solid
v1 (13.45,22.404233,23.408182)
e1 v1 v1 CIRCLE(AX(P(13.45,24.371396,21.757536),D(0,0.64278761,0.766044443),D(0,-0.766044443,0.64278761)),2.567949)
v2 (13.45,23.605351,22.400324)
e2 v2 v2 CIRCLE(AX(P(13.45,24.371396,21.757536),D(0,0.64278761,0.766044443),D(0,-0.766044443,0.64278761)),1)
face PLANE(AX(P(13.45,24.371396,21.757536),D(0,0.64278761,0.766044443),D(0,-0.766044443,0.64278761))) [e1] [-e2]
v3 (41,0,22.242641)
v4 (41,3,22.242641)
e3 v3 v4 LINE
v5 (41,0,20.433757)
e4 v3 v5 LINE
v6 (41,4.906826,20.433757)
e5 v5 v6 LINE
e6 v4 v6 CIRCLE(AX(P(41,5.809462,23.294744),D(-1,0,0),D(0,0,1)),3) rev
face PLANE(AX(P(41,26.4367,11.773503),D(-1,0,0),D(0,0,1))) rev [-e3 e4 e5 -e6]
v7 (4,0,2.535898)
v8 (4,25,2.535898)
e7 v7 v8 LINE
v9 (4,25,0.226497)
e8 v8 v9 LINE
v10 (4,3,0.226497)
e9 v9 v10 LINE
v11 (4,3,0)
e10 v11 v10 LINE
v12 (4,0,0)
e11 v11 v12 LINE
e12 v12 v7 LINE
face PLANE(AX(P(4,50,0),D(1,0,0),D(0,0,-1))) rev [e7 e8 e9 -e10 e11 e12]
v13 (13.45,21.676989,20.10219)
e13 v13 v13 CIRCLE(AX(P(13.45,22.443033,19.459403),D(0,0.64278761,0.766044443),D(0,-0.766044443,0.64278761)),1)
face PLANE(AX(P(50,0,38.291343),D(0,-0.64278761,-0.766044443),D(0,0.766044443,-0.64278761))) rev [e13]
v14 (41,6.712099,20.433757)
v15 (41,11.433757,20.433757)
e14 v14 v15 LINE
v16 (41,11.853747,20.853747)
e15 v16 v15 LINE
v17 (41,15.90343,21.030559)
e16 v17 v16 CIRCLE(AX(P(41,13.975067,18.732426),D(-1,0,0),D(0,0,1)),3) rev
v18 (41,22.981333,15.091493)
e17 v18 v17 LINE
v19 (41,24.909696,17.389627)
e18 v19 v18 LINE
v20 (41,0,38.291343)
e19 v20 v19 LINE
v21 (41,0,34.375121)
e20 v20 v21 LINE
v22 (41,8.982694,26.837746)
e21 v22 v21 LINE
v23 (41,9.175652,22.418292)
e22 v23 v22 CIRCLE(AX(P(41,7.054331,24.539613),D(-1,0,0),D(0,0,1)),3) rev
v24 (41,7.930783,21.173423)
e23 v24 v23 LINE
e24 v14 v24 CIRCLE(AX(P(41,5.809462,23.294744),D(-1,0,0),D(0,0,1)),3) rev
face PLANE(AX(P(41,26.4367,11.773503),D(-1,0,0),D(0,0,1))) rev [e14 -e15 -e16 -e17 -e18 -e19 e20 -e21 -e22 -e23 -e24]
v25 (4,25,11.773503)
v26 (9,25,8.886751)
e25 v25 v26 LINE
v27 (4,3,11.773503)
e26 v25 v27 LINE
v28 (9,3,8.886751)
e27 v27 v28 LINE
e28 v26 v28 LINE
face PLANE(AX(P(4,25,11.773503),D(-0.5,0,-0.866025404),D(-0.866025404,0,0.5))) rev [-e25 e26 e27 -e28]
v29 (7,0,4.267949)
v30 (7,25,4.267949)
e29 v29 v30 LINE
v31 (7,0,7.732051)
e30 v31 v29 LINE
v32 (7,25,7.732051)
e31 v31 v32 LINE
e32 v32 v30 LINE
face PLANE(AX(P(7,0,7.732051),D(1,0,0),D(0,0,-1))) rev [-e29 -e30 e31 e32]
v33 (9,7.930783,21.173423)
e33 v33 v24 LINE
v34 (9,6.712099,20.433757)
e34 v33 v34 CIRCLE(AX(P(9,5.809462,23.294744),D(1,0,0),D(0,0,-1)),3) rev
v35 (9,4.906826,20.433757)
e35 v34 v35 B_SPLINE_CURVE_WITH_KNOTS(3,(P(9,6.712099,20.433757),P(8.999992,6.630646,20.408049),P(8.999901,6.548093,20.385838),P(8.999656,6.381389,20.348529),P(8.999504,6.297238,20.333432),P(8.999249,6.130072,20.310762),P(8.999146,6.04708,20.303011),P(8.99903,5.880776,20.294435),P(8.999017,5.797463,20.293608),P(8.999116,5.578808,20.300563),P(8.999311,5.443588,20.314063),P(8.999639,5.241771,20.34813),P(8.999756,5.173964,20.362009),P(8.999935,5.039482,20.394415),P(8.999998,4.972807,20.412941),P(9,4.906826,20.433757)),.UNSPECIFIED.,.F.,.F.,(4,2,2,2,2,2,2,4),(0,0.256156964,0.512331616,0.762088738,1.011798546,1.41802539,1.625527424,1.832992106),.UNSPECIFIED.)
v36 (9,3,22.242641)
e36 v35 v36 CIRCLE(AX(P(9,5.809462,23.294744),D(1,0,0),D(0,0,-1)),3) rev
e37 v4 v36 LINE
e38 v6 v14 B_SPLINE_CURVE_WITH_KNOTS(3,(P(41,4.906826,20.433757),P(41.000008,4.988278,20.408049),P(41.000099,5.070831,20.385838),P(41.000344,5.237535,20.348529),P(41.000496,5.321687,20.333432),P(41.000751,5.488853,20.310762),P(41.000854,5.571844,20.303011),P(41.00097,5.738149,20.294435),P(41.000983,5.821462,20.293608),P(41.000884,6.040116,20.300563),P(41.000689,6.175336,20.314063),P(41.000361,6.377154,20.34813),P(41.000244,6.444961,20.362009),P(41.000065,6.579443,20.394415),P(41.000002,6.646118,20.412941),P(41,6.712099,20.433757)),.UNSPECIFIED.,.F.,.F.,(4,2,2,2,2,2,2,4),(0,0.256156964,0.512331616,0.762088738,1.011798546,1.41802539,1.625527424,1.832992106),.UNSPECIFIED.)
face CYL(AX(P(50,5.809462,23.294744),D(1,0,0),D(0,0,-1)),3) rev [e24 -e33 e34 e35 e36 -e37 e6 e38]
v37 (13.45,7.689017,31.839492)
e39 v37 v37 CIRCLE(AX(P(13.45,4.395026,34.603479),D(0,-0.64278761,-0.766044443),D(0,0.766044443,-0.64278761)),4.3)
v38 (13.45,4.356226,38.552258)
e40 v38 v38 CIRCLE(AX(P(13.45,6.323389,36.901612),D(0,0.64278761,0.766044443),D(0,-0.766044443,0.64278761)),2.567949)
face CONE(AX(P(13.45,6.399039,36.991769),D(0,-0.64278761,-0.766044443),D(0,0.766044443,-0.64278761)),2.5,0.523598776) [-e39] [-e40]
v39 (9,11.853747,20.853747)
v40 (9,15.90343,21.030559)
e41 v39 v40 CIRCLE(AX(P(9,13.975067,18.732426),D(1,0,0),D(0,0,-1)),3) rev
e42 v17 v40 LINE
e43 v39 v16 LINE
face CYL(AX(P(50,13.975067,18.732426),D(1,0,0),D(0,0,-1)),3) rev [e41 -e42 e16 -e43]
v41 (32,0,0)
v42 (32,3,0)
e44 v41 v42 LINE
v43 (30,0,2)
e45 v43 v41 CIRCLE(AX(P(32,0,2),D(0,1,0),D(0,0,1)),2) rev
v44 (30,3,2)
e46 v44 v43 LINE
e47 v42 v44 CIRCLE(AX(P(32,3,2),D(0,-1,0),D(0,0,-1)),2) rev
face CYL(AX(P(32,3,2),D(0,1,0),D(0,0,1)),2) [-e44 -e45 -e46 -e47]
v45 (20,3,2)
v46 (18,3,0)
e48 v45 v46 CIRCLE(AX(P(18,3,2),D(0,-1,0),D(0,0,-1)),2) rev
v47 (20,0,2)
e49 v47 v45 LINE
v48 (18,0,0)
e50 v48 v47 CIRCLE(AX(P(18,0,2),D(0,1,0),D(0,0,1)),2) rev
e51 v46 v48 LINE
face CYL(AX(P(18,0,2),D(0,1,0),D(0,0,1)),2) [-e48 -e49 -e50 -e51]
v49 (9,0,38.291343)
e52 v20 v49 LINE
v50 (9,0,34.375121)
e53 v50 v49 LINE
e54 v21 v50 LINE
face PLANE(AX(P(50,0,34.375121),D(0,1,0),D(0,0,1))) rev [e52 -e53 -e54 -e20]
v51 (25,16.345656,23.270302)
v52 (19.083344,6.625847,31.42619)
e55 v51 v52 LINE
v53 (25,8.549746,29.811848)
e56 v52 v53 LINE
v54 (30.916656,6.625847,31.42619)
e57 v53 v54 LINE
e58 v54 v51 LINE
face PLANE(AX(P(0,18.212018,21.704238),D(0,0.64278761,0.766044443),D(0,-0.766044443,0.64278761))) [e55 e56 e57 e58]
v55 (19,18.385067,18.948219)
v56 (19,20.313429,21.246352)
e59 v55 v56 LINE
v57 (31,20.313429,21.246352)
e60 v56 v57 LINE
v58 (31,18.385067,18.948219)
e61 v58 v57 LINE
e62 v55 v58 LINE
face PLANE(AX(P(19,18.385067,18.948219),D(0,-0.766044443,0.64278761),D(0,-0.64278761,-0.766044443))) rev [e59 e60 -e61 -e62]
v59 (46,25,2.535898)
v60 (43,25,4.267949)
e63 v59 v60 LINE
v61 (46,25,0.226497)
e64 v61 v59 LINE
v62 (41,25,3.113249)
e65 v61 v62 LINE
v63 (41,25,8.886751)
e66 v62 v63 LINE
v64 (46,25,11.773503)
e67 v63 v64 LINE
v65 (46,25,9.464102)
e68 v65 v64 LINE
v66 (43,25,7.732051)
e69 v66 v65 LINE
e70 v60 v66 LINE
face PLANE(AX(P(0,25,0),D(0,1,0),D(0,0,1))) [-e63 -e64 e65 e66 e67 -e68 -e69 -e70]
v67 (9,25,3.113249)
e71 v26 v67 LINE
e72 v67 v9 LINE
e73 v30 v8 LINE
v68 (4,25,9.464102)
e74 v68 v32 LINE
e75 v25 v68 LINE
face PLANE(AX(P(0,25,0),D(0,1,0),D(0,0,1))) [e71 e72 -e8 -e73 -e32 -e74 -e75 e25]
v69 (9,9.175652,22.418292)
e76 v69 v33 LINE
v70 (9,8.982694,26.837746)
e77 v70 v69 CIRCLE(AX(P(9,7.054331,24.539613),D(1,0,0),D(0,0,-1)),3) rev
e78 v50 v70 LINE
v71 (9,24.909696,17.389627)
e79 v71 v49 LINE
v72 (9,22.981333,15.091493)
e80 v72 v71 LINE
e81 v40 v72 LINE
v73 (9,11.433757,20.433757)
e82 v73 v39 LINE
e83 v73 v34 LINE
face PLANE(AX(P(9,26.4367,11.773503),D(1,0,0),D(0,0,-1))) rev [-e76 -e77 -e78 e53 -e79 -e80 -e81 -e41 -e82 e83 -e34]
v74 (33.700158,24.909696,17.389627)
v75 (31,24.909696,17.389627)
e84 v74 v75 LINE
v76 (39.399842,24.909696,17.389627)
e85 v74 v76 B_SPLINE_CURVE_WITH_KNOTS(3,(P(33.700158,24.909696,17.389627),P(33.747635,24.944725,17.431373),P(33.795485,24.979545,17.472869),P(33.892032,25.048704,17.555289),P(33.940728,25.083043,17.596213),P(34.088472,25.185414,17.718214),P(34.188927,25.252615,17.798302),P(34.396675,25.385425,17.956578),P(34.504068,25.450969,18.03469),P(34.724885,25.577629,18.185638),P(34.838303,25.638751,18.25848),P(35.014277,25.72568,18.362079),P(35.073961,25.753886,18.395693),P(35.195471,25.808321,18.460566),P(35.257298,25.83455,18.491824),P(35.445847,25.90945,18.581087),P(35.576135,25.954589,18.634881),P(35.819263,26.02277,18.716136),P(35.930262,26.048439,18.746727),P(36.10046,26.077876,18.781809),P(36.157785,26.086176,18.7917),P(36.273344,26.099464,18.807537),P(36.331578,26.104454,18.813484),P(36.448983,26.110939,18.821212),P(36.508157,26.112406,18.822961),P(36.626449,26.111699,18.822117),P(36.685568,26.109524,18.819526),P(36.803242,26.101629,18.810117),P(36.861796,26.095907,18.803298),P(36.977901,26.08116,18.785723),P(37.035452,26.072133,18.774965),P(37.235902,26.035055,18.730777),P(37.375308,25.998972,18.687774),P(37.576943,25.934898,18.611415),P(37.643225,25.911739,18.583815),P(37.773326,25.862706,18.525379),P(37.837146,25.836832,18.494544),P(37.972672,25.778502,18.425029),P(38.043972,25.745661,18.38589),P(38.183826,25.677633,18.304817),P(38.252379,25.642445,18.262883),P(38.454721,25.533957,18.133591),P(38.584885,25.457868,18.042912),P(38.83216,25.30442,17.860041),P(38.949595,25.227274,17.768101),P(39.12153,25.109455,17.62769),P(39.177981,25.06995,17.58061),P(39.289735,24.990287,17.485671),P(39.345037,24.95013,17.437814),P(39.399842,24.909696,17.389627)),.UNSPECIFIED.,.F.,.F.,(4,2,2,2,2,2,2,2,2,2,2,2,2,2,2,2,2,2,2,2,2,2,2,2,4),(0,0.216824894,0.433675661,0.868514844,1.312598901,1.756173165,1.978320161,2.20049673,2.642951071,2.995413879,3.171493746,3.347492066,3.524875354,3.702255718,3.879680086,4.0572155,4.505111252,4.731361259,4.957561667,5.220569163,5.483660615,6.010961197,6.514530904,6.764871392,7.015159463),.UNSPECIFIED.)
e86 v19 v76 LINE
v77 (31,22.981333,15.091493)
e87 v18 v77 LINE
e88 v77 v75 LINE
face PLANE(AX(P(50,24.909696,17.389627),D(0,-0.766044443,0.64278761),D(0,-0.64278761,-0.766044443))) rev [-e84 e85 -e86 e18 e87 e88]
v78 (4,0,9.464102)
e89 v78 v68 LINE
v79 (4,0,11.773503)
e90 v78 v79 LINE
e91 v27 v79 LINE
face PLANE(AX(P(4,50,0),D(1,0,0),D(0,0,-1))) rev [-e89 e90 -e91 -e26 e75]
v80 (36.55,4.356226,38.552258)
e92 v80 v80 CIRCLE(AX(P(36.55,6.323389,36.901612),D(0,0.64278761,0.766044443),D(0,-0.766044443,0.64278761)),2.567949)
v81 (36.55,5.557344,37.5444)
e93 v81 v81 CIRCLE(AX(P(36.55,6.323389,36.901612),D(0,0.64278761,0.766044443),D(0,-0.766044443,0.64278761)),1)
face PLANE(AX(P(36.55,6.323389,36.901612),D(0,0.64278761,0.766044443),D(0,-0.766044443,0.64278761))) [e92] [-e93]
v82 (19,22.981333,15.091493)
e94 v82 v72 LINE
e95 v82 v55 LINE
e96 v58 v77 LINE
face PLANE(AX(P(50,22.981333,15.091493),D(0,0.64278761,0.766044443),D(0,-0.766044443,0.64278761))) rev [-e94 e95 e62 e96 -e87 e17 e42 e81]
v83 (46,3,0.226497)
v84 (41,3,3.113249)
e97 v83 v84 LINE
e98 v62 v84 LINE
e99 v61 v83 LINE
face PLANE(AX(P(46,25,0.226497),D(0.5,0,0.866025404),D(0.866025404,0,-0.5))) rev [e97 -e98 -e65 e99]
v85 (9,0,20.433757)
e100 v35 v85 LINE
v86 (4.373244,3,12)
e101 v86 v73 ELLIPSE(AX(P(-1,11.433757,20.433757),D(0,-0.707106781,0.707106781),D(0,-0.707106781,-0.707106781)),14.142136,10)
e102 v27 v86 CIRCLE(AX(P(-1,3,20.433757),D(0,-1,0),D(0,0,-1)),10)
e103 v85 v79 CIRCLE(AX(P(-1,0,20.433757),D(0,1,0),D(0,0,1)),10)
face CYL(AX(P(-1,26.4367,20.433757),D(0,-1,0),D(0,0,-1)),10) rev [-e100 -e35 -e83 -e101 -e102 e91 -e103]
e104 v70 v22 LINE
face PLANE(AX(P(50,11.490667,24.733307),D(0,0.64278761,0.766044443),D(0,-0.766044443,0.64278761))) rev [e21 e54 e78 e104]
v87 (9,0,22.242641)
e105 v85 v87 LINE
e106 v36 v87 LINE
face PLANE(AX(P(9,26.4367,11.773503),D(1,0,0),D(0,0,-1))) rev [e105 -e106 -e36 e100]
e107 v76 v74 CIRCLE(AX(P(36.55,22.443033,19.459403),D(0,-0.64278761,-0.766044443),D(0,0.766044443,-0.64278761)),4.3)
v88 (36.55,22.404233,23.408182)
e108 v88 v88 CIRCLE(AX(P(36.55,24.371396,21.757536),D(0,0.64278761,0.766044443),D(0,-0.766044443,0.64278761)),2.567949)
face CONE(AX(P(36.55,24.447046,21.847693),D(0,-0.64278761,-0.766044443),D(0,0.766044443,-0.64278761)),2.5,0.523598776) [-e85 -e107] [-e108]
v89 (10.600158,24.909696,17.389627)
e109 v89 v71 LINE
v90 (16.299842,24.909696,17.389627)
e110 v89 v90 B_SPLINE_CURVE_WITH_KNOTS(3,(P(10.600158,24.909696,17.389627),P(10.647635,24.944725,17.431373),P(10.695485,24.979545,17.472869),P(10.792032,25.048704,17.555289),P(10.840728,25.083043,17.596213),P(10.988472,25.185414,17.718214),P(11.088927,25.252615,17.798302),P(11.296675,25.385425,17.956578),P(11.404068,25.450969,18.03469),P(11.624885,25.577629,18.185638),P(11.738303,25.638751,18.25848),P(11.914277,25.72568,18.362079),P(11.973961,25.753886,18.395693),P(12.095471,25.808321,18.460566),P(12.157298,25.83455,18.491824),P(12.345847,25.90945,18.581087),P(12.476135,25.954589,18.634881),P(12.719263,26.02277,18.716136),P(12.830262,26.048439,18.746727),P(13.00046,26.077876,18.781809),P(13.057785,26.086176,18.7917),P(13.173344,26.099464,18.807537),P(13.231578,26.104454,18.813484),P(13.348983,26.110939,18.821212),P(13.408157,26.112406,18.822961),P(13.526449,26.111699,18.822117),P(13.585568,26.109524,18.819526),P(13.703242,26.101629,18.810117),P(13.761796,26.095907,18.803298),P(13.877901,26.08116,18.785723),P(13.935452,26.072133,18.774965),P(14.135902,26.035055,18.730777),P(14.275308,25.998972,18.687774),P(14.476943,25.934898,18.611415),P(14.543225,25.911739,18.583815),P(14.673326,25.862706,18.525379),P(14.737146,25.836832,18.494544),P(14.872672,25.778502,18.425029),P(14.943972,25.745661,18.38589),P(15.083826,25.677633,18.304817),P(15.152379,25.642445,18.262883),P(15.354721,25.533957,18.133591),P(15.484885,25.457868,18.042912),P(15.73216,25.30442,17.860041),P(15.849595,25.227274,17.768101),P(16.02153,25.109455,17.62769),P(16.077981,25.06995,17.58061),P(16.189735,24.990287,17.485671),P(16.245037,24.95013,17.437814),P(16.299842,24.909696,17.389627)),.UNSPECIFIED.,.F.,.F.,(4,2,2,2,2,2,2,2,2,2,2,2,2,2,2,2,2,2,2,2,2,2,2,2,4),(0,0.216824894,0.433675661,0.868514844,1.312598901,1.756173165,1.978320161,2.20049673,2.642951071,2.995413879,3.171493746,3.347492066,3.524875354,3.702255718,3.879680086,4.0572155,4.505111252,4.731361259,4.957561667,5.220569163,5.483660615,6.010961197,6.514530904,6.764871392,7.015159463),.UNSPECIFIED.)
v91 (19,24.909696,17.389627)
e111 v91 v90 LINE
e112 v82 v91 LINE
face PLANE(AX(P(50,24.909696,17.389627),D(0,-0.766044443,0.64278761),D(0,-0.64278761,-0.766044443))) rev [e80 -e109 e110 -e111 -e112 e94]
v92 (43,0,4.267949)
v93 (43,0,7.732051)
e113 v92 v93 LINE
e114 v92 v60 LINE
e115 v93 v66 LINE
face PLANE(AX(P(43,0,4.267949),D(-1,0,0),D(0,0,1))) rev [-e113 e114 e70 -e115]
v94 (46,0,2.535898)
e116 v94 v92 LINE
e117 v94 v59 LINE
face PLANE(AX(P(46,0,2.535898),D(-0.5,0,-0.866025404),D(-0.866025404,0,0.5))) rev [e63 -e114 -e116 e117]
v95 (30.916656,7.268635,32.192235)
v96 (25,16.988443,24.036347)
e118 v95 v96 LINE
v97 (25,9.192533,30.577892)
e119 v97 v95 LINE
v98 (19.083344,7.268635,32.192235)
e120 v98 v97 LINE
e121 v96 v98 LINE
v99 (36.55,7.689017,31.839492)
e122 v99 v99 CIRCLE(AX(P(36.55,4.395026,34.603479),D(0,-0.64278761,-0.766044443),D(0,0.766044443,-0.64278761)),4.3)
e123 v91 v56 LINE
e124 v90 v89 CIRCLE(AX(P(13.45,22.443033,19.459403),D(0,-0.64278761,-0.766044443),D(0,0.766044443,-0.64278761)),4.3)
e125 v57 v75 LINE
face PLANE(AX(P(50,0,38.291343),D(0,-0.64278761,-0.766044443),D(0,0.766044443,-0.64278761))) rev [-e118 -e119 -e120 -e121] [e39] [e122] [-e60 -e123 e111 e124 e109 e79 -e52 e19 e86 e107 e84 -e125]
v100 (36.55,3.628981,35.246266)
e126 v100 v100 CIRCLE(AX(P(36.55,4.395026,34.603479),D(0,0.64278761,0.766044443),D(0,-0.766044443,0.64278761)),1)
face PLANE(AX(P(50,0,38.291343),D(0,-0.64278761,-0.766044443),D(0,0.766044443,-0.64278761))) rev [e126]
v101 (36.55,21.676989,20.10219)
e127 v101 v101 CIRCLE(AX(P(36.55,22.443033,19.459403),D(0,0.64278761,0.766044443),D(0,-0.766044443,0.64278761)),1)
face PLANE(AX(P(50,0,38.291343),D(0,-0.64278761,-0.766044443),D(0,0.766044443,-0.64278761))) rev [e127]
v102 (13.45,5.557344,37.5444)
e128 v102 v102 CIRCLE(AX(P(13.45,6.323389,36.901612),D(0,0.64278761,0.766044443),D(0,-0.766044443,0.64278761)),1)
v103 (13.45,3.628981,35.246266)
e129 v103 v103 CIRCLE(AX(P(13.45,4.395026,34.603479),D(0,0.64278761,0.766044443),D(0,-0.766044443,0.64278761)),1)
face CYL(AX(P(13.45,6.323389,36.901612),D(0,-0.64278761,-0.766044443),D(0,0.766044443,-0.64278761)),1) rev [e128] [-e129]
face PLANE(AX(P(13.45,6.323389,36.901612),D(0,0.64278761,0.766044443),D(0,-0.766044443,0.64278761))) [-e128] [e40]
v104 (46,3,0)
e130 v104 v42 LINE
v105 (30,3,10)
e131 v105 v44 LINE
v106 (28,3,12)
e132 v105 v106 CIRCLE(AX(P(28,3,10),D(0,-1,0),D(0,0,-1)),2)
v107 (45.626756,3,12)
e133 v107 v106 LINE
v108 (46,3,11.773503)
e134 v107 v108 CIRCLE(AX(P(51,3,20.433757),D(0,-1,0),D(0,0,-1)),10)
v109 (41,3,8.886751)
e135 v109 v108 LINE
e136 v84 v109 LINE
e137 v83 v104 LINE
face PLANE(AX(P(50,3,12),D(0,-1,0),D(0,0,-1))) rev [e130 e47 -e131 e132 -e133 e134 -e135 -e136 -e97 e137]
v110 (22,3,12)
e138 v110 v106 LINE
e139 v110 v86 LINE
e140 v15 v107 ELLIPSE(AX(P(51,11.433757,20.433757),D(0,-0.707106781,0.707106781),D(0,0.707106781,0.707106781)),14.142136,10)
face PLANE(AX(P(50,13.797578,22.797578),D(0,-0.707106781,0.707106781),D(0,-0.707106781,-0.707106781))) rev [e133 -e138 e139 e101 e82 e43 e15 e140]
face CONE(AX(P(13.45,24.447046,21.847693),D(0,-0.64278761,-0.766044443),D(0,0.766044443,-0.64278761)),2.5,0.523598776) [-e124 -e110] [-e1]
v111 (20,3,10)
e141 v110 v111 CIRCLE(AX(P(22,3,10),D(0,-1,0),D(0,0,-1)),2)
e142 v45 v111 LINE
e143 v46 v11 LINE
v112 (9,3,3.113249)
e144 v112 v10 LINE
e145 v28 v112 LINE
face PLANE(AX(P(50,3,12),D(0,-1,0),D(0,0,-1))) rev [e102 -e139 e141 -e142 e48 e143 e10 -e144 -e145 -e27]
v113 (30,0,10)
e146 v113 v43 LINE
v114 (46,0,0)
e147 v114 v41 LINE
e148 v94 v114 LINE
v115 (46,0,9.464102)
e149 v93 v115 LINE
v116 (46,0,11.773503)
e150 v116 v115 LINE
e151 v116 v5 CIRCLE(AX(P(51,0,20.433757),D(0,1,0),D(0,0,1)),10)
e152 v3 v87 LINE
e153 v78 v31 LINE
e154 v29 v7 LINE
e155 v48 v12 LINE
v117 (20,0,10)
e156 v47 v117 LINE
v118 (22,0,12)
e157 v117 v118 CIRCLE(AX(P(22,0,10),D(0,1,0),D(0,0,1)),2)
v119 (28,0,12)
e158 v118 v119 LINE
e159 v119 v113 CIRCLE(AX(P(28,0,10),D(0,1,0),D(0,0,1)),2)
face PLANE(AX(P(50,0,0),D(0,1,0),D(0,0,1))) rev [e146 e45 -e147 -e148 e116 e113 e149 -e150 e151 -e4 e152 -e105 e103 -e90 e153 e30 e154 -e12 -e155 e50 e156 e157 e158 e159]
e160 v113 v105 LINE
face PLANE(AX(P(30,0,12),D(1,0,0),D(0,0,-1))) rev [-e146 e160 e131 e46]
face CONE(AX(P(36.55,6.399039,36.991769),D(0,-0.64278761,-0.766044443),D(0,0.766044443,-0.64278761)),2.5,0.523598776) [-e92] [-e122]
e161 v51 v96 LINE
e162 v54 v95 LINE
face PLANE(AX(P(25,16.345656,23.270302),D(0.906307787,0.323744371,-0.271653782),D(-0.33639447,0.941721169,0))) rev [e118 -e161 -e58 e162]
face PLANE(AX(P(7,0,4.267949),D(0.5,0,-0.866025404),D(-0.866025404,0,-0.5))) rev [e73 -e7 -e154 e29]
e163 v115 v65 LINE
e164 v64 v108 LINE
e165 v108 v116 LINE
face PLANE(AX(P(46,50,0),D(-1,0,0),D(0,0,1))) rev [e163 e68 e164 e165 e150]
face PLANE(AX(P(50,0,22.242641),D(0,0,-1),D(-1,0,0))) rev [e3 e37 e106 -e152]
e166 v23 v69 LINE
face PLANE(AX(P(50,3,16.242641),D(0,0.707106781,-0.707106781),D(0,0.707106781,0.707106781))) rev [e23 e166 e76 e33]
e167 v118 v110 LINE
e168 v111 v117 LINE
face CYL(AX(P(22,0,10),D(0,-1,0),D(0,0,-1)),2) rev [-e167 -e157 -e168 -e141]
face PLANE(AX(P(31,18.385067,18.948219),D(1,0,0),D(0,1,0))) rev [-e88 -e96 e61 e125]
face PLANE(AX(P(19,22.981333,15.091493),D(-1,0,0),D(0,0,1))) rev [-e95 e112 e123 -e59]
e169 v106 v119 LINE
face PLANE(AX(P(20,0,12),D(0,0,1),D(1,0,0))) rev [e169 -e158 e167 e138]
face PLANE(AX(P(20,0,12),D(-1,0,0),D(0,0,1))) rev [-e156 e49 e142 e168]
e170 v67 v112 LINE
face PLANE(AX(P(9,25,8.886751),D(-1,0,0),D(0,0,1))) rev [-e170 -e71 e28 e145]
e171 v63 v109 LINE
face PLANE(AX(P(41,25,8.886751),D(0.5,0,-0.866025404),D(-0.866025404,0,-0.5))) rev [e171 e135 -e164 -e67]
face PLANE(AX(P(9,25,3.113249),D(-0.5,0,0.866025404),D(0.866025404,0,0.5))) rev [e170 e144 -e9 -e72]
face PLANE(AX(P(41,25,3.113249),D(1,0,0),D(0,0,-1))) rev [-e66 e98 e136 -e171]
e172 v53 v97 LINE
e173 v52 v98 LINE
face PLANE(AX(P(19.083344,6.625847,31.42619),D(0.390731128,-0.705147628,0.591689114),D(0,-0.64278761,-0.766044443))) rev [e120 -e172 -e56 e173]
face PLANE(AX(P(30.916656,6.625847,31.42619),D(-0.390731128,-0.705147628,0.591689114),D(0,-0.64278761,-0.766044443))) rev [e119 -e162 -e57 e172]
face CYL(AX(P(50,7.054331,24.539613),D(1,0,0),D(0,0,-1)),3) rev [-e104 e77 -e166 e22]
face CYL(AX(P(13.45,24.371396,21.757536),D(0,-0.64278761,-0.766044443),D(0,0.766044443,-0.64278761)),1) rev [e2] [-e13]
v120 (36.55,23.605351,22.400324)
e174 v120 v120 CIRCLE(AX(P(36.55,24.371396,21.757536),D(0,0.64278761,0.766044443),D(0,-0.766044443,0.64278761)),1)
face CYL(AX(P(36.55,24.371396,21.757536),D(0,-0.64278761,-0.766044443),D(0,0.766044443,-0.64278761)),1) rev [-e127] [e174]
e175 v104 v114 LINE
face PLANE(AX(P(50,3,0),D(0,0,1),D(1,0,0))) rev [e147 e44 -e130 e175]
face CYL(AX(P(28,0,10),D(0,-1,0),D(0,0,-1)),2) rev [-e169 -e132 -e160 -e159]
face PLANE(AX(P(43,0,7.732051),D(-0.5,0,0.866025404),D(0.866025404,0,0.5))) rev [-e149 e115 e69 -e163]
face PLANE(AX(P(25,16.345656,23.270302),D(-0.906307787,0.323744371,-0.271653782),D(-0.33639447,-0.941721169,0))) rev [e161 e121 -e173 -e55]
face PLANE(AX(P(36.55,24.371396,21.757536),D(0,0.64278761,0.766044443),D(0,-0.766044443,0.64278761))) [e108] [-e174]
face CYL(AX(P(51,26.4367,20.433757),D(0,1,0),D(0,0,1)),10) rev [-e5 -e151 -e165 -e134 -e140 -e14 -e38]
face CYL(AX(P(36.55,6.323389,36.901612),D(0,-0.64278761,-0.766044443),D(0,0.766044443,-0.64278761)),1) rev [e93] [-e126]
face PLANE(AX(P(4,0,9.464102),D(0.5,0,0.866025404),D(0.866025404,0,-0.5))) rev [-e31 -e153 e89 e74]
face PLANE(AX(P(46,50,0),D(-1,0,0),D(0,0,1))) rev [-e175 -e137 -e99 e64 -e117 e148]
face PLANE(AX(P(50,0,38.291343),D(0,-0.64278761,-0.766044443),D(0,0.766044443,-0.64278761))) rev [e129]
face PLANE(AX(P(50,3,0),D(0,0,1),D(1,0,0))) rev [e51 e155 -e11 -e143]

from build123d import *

# Parameters (mm, degrees)
EXTRUDE_1_DEPTH     = 50
CUT_EXTRUDE_1_DEPTH = 67.680295137
EXTRUDE_2_DEPTH     = 22
SKETCH_6_W          = 5
SKETCH_6_H          = 38.291343347
CUT_EXTRUDE_5_DEPTH = 50
SKETCH_8_R          = 2.5
SKETCH_8_R_2        = 1
EXTRUDE_4_DEPTH     = 3
CHAMFER_1_SIZE      = 1.8
CHAMFER_1_SIZE_2    = 3.117691454
SKETCH_9_W          = 10
SKETCH_9_H          = 12
CUT_EXTRUDE_6_DEPTH = 3
SKETCH_10_W         = 12
SKETCH_10_H         = 6
CUT_EXTRUDE_7_DEPTH = 3
FILLET_2_R          = 3
FILLET_3_R          = 3
FILLET_4_R          = 3
CUT_EXTRUDE_8_DEPTH = 1
FILLET_7_R          = 2
SKETCH_12_W         = 5
SKETCH_12_H         = 26.517840655
CUT_EXTRUDE_9_DEPTH = 66.543850106
FILLET_8_R          = 10


with BuildPart() as part:
    # Эскиз2 → Бобышка-Вытянуть1 (new body)
    with BuildSketch(Plane(origin=(0, 0, 0), x_dir=(0, 0, -1), z_dir=(1, 0, 0))):
        Polygon((0, 0), (-22.242640687, 0), (-22.242640687, 3), (-16.242640687, 3), (-24.733307334, 11.490666647), (-34.375121479, 0), (-38.291343347, 0), (-17.389626518, 24.909696123), (-15.091493189, 22.981333294), (-22.797578472, 13.797578472), (-12, 3), (0, 3), align=None)
    extrude(amount=EXTRUDE_1_DEPTH)

    # Эскиз3 → Вырез-Вытянуть1 (cut, through all)
    with BuildSketch(Plane(origin=(0, 3, 0), x_dir=(1, 0, 0), z_dir=(0, 1, 0))):
        Polygon((4, -2.535898385), (1, -4.267949192), (1, -7.732050808), (4, -9.464101615), (7, -7.732050808), (7, -4.267949192), align=None)
        Polygon((46, -2.535898385), (43, -4.267949192), (43, -7.732050808), (46, -9.464101615), (49, -7.732050808), (49, -4.267949192), align=None)
    extrude(amount=-CUT_EXTRUDE_1_DEPTH, mode=Mode.SUBTRACT)

    # Эскиз5 → Бобышка-Вытянуть2 (add)
    # profile 1 of 2: a face of its own
    with BuildSketch(Plane(origin=(0, 3, 0), x_dir=(1, 0, 0), z_dir=(0, 1, 0))):
        Polygon((4, -0.226497308), (-1, -3.113248654), (-1, -8.886751346), (4, -11.773502692), (9, -8.886751346), (9, -3.113248654), align=None)
        Polygon((4, -2.535898385), (1, -4.267949192), (1, -7.732050808), (4, -9.464101615), (7, -7.732050808), (7, -4.267949192), align=None, mode=Mode.SUBTRACT)
    # profile 2 of 2: a face of its own
    with BuildSketch(Plane(origin=(0, 3, 0), x_dir=(1, 0, 0), z_dir=(0, 1, 0))):
        Polygon((46, -0.226497308), (41, -3.113248654), (41, -8.886751346), (46, -11.773502692), (51, -8.886751346), (51, -3.113248654), align=None)
        Polygon((46, -2.535898385), (43, -4.267949192), (43, -7.732050808), (46, -9.464101615), (49, -7.732050808), (49, -4.267949192), align=None, mode=Mode.SUBTRACT)
    extrude(amount=EXTRUDE_2_DEPTH)

    # Эскиз6 → Вырез-Вытянуть5 (cut)
    with BuildSketch(Plane.XZ):
        with Locations((48.5, 19.145671674)):
            Rectangle(SKETCH_6_W, SKETCH_6_H)
        with Locations((1.5, 19.145671674)):
            Rectangle(SKETCH_6_W, SKETCH_6_H)
    extrude(amount=-CUT_EXTRUDE_5_DEPTH, mode=Mode.SUBTRACT)

    # Эскиз8 → Бобышка-Вытянуть4 (add)
    # profile 1 of 4: a face of its own
    with BuildSketch(Plane(origin=(0, 18.854805901, 22.47028267), x_dir=(1, 0, 0), z_dir=(0, 0.6427876096865299, 0.766044443118986))):
        with Locations(Location((36.55, 4.684097832, 0), (0, 0, 90))):
            Circle(SKETCH_8_R)
        with Locations(Location((36.55, 4.684097832, 0), (0, 0, 270))):
            Circle(SKETCH_8_R_2, mode=Mode.SUBTRACT)
    # profile 2 of 4: a face of its own
    with BuildSketch(Plane(origin=(0, 18.854805901, 22.47028267), x_dir=(1, 0, 0), z_dir=(0, 0.6427876096865299, 0.766044443118986))):
        with Locations(Location((13.45, 4.684097832, 0), (0, 0, 90))):
            Circle(SKETCH_8_R)
        with Locations(Location((13.45, 4.684097832, 0), (0, 0, 270))):
            Circle(SKETCH_8_R_2, mode=Mode.SUBTRACT)
    # profile 3 of 4: a face of its own
    with BuildSketch(Plane(origin=(0, 18.854805901, 22.47028267), x_dir=(1, 0, 0), z_dir=(0, 0.6427876096865299, 0.766044443118986))):
        with Locations(Location((13.45, -18.875902168, 0), (0, 0, 90))):
            Circle(SKETCH_8_R)
        with Locations(Location((13.45, -18.875902168, 0), (0, 0, 270))):
            Circle(SKETCH_8_R_2, mode=Mode.SUBTRACT)
    # profile 4 of 4: a face of its own
    with BuildSketch(Plane(origin=(0, 18.854805901, 22.47028267), x_dir=(1, 0, 0), z_dir=(0, 0.6427876096865299, 0.766044443118986))):
        with Locations(Location((36.55, -18.875902168, 0), (0, 0, 90))):
            Circle(SKETCH_8_R)
        with Locations(Location((36.55, -18.875902168, 0), (0, 0, 270))):
            Circle(SKETCH_8_R_2, mode=Mode.SUBTRACT)
    extrude(amount=EXTRUDE_4_DEPTH)

    # Фаска1
    # the kernel refuses this chamfer: 3.117691454, 1.8 mm, written as the material it adds along each edge
    with BuildSketch(Plane(origin=(36.55, 4.395025936, 34.603478705), x_dir=(0, 0.7660444431189859, -0.6427876096865299), z_dir=(1, 0, 0))) as chamfer_1_piece_1_section:
        Polygon((2.5 + CHAMFER_1_SIZE, 0), (2.5, CHAMFER_1_SIZE_2), (2.5, 0), align=None)
    chamfer_1_piece_1 = revolve(axis=Axis((36.55, 4.395025936, 34.603478705), (0, 0.6427876096865299, 0.766044443118986)), mode=Mode.PRIVATE)
    chamfer_1_piece_1 = split(chamfer_1_piece_1, bisect_by=Plane(origin=(36.55, 3.695067891, 39.107035111), z_dir=(0, -0.6427876096865299, -0.766044443118986)), keep=Keep.TOP, mode=Mode.PRIVATE)
    add(chamfer_1_piece_1)
    with BuildSketch(Plane(origin=(13.45, 4.395025936, 34.603478705), x_dir=(0, 0.7660444431189862, -0.6427876096865297), z_dir=(1, 0, 0))) as chamfer_1_piece_2_section:
        Polygon((2.5 + CHAMFER_1_SIZE, 0), (2.5, CHAMFER_1_SIZE_2), (2.5, 0), align=None)
    chamfer_1_piece_2 = revolve(axis=Axis((13.45, 4.395025936, 34.603478705), (0, 0.6427876096865299, 0.766044443118986)), mode=Mode.PRIVATE)
    chamfer_1_piece_2 = split(chamfer_1_piece_2, bisect_by=Plane(origin=(13.45, 3.695067891, 39.107035111), z_dir=(0, -0.6427876096865299, -0.766044443118986)), keep=Keep.TOP, mode=Mode.PRIVATE)
    add(chamfer_1_piece_2)
    with BuildSketch(Plane(origin=(36.55, 22.443033016, 19.459402621), x_dir=(0, 0.7660444431189869, -0.6427876096865287), z_dir=(1, 0, 0))) as chamfer_1_piece_3_section:
        Polygon((2.5 + CHAMFER_1_SIZE, 0), (2.5, CHAMFER_1_SIZE_2), (2.5, 0), align=None)
    chamfer_1_piece_3 = revolve(axis=Axis((36.55, 22.443033016, 19.459402621), (0, 0.6427876096865299, 0.766044443118986)), mode=Mode.PRIVATE)
    chamfer_1_piece_3 = split(chamfer_1_piece_3, bisect_by=Plane(origin=(36.55, 25.826754315, 18.482533914), z_dir=(0, -0.7660444431189845, 0.6427876096865317)), keep=Keep.TOP, mode=Mode.PRIVATE)
    chamfer_1_piece_3 = split(chamfer_1_piece_3, bisect_by=Plane(origin=(36.55, 21.742557786, 23.963392996), z_dir=(0, -0.6427876096865299, -0.766044443118986)), keep=Keep.TOP, mode=Mode.PRIVATE)
    add(chamfer_1_piece_3)
    with BuildSketch(Plane(origin=(13.45, 22.443033016, 19.459402621), x_dir=(0, 0.7660444431189863, -0.6427876096865293), z_dir=(1, 0, 0))) as chamfer_1_piece_4_section:
        Polygon((2.5 + CHAMFER_1_SIZE, 0), (2.5, CHAMFER_1_SIZE_2), (2.5, 0), align=None)
    chamfer_1_piece_4 = revolve(axis=Axis((13.45, 22.443033016, 19.459402621), (0, 0.6427876096865299, 0.766044443118986)), mode=Mode.PRIVATE)
    chamfer_1_piece_4 = split(chamfer_1_piece_4, bisect_by=Plane(origin=(13.45, 25.826754315, 18.482533914), z_dir=(0, -0.7660444431189845, 0.6427876096865317)), keep=Keep.TOP, mode=Mode.PRIVATE)
    chamfer_1_piece_4 = split(chamfer_1_piece_4, bisect_by=Plane(origin=(13.45, 21.742557786, 23.963392996), z_dir=(0, -0.6427876096865299, -0.766044443118986)), keep=Keep.TOP, mode=Mode.PRIVATE)
    add(chamfer_1_piece_4)

    # Эскиз9 → Вырез-Вытянуть6 (cut)
    with BuildSketch(Plane(origin=(0, 3, 0), x_dir=(1, 0, 0), z_dir=(0, 1, 0))):
        with Locations((25, -6)):
            Rectangle(SKETCH_9_W, SKETCH_9_H)
    extrude(amount=-CUT_EXTRUDE_6_DEPTH, mode=Mode.SUBTRACT)

    # Эскиз10 → Вырез-Вытянуть7 (cut)
    with BuildSketch(Plane(origin=(0, 18.854805901, 22.47028267), x_dir=(1, 0, 0), z_dir=(0, 0.6427876096865299, 0.766044443118986))):
        with Locations((25, 4.904097832)):
            Rectangle(SKETCH_10_W, SKETCH_10_H)
    extrude(amount=-CUT_EXTRUDE_7_DEPTH, mode=Mode.SUBTRACT)

    # Скругление2
    fillet_2_edges = [part.edges().sort_by_distance(p)[0] for p in [
        (25, 11.490666647, 24.733307334),
    ]]
    fillet(fillet_2_edges, radius=FILLET_2_R)

    # Скругление3
    # the kernel refuses this fillet: 3 mm, written as the material it adds along each edge
    with BuildSketch(Plane(origin=(4, 3, 16.242640687), x_dir=(0, 0.7071067811865437, 0.7071067811865515), z_dir=(1, 0, 0))) as fillet_3_piece_1:
        with BuildLine():
            CenterArc((6.97317985, 3), FILLET_3_R, 155.530199479, 114.469800521)
            Line((4.242640687, 4.242640687), (4.188029904, 4.267493501))
            ThreePointArc((4.188029904, 4.267493501), (2.078893937, 2.16374675), (-0.042426407, 0.042426407))
            Line((-0.042426407, 0.042426407), (0, -0.06))
            Line((0, -0.06), (6.97317985, -0.06))
            Line((6.97317985, -0.06), (6.97317985, 0))
        make_face()
    extrude(amount=42)

    # Скругление4
    fillet_4_edges = [part.edges().sort_by_distance(p)[0] for p in [
        (25, 13.797578472, 22.797578472),
    ]]
    fillet(fillet_4_edges, radius=FILLET_4_R)

    # Эскиз11 → Вырез-Вытянуть8 (cut)
    with BuildSketch(Plane(origin=(0, 18.854805901, 22.47028267), x_dir=(1, 0, 0), z_dir=(0, 0.6427876096865303, 0.7660444431189857))):
        Polygon((25, -2.436363369), (19.083344336, -15.124672388), (25, -12.613201062), (30.916655664, -15.124672388), align=None)
    extrude(amount=-CUT_EXTRUDE_8_DEPTH, mode=Mode.SUBTRACT)

    # Скругление7
    fillet_7_edges = [part.edges().sort_by_distance(p)[0] for p in [
        (30, 1.5, 0),
        (30, 1.5, 12),
        (20, 1.5, 12),
        (20, 1.5, 0),
    ]]
    fillet(fillet_7_edges, radius=FILLET_7_R)

    # Эскиз12 → Вырез-Вытянуть9 (cut, through all)
    with BuildSketch(Plane.XZ):
        with Locations((6.5, 25.03242302)):
            Rectangle(SKETCH_12_W, SKETCH_12_H)
        with Locations((43.5, 25.03242302)):
            Rectangle(SKETCH_12_W, SKETCH_12_H)
    extrude(amount=-CUT_EXTRUDE_9_DEPTH, mode=Mode.SUBTRACT)

    # Скругление8
    # the kernel refuses this fillet: 10 mm, written as the material it adds along each edge
    with BuildSketch(Plane(origin=(41, 0, 11.773502692), x_dir=(0, 0, 1), z_dir=(0, 1, 0))) as fillet_8_piece_1:
        with BuildLine():
            CenterArc((8.660254038, 10), FILLET_8_R, 210, 60)
            Line((0, 5), (0, 0))
            Line((0, 0), (8.660254038, 0))
        make_face()
    extrude(amount=3)
    with BuildSketch(Plane(origin=(41, 0, 11.773502692), x_dir=(0, 0, 1), z_dir=(0, 1, 0))) as fillet_8_piece_2_section:
        with BuildLine():
            CenterArc((8.660254038, 10), FILLET_8_R, 210, 60)
            Line((0, 5), (0, 0))
            Line((0, 0), (8.660254038, 0))
        make_face()
    fillet_8_piece_2 = extrude(amount=24.650635095, mode=Mode.PRIVATE)
    fillet_8_piece_2 = split(fillet_8_piece_2, bisect_by=Plane(origin=(41.119825884, 8.491267272, 17.491267272), z_dir=(0, -0.7071067811865512, 0.7071067811865439)), keep=Keep.TOP, mode=Mode.PRIVATE)
    fillet_8_piece_2 = fillet_8_piece_2 - Plane(origin=(41.119825884, 5.809462415, 23.294743789), x_dir=(0, 0.7071067811865476, 0.7071067811865476), z_dir=(-1, 0, 0)) * Cylinder(3, 84, mode=Mode.PRIVATE)
    add(fillet_8_piece_2)
    with BuildSketch(Plane(origin=(9, 0, 11.773502692), x_dir=(0, 0, 1), z_dir=(0, 1, 0))) as fillet_8_piece_3:
        with BuildLine():
            CenterArc((8.660254038, -10), FILLET_8_R, 90, 60)
            Line((0, -5), (0, 0))
            Line((0, 0), (8.660254038, 0))
        make_face()
    extrude(amount=3)
    with BuildSketch(Plane(origin=(9, 0, 11.773502692), x_dir=(0, 0, 1), z_dir=(0, 1, 0))) as fillet_8_piece_4_section:
        with BuildLine():
            CenterArc((8.660254038, -10), FILLET_8_R, 90, 60)
            Line((0, -5), (0, 0))
            Line((0, 0), (8.660254038, 0))
        make_face()
    fillet_8_piece_4 = extrude(amount=24.650635095, mode=Mode.PRIVATE)
    fillet_8_piece_4 = split(fillet_8_piece_4, bisect_by=Plane(origin=(8.880174116, 8.491267272, 17.491267272), z_dir=(0, -0.7071067811865512, 0.7071067811865439)), keep=Keep.TOP, mode=Mode.PRIVATE)
    fillet_8_piece_4 = fillet_8_piece_4 - Plane(origin=(8.880174116, 5.809462415, 23.294743789), x_dir=(0, 0.7071067811865476, 0.7071067811865476), z_dir=(-1, 0, 0)) * Cylinder(3, 84, mode=Mode.PRIVATE)
    add(fillet_8_piece_4)


solid = part.part
